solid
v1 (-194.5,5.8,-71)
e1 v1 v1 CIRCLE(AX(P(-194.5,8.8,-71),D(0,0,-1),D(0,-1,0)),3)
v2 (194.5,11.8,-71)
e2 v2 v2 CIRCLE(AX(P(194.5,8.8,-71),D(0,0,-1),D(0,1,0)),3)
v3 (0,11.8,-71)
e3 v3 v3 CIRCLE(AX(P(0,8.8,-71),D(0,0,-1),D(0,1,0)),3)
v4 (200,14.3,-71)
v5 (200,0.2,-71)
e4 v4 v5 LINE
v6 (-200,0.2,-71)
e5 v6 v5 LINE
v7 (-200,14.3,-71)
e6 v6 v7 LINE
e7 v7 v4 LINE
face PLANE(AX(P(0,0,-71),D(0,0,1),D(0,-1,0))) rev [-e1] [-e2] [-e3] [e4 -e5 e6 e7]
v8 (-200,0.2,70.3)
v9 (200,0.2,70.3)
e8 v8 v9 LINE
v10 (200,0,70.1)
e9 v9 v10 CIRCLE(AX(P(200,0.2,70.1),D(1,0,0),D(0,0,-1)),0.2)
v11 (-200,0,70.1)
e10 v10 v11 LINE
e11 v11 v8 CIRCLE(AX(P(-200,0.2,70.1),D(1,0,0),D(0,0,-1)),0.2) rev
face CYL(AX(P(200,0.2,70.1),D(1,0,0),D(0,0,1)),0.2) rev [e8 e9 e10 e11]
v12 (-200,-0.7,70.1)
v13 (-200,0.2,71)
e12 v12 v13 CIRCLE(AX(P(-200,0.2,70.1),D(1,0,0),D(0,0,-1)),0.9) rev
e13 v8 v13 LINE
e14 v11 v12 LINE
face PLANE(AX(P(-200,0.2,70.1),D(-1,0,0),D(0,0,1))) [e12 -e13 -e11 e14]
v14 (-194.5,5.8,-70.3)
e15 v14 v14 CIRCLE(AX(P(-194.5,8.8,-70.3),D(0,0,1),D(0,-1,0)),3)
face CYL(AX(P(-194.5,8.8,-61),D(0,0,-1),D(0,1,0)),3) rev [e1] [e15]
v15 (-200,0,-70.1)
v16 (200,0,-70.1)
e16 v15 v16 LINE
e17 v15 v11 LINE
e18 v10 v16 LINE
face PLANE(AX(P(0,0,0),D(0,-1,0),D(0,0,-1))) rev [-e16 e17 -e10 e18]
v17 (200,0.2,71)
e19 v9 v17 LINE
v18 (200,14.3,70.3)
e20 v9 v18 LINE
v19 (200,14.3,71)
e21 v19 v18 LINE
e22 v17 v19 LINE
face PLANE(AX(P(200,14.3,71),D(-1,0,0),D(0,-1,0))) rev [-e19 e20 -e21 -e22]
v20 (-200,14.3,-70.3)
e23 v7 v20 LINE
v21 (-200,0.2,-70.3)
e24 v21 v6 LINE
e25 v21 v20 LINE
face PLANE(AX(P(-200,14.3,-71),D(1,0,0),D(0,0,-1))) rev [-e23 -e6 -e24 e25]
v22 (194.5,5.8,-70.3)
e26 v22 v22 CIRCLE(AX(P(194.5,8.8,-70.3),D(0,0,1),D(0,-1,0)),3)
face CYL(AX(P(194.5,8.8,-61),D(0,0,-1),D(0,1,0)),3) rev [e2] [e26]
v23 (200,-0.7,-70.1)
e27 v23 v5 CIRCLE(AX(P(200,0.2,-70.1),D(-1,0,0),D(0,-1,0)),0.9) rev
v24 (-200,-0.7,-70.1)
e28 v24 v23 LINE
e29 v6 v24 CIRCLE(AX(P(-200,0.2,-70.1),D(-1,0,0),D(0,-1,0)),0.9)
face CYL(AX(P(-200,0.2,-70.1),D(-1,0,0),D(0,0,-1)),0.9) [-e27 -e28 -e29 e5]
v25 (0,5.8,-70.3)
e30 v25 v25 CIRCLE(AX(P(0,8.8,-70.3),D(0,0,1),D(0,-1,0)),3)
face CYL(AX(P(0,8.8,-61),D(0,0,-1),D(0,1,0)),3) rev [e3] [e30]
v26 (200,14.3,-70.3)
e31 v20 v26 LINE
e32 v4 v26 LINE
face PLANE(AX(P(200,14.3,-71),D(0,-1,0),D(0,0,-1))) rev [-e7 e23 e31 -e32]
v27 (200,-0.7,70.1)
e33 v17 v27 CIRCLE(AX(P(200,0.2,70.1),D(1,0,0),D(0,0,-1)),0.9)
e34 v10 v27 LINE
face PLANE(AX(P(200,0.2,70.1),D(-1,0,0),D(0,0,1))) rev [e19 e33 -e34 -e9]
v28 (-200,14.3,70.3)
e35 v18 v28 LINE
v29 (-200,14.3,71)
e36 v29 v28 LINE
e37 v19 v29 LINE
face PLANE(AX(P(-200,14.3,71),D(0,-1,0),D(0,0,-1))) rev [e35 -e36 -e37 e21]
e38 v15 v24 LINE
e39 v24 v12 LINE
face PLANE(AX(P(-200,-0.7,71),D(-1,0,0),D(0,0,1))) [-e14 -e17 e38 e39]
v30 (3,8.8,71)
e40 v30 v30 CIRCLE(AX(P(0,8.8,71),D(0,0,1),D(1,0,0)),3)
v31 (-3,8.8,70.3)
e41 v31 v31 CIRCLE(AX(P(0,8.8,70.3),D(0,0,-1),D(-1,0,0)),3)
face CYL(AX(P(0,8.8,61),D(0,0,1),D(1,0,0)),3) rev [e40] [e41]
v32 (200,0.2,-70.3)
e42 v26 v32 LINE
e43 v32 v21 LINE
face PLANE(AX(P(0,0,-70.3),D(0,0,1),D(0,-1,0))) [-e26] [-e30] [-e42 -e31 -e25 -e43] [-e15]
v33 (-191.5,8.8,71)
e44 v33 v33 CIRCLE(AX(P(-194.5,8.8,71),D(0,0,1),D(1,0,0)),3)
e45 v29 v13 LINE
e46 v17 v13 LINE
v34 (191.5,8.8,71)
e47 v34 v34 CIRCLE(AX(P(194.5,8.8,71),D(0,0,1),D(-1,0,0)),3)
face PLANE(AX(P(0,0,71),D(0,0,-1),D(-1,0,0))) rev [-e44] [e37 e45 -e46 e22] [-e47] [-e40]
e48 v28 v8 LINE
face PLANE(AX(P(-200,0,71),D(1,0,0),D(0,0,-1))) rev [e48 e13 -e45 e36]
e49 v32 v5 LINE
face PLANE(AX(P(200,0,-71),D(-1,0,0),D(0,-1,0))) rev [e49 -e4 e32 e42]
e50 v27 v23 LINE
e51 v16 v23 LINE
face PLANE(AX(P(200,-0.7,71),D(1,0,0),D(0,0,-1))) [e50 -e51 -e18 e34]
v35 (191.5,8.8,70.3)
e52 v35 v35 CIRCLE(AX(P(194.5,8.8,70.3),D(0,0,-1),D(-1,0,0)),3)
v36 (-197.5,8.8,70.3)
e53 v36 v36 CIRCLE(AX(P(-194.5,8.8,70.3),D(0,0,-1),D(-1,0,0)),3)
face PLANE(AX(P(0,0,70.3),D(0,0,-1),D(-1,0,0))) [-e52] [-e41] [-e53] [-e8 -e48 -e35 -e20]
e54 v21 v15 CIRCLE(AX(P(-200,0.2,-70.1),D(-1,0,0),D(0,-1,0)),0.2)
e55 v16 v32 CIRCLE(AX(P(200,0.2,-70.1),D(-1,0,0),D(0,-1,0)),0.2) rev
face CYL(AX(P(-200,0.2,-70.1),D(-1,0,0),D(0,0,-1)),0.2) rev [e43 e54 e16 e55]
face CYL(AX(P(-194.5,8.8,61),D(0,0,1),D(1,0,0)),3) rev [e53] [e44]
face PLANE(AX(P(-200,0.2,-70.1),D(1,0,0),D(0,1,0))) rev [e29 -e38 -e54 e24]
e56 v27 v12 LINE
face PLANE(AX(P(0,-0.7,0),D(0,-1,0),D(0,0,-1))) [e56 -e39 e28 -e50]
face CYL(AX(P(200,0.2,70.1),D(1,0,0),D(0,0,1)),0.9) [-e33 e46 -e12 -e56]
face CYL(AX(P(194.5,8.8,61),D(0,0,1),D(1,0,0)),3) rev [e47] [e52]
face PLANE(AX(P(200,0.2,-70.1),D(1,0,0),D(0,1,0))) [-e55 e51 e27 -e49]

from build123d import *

# Parameters (mm, degrees)
SKETCH_1_W                         = 400
SKETCH_1_H                         = 142
SM_BASE_FLANGE_1_DEPTH             = 0.7
SM_EDGE_FLANGE_1_STRIP_W           = 3.2
SM_EDGE_FLANGE_1_STRIP_H           = 0.7
SM_EDGE_FLANGE_1_STRIP_CUT_DEPTH   = 400
SM_EDGE_FLANGE_1_STRIP_2_W         = 3.2
SM_EDGE_FLANGE_1_STRIP_2_H         = 0.7
SM_EDGE_FLANGE_1_STRIP_CUT_2_DEPTH = 400
SM_EDGE_FLANGE_1_DEPTH             = 400
SM_EDGE_FLANGE_1_BEND_DEPTH        = 400
SKETCH_17_R                        = 3
CUT_EXTRUDE_1_DEPTH                = 10
CUT_EXTRUDE_START                  = -10
SKETCH_18_R                        = 3
CUT_EXTRUDE_2_DEPTH                = 10


# Sheet-metal steps are written as plain solids
with BuildPart() as part:
    # 草图1 → 基体-法兰1 (new body)
    with BuildSketch(Plane(origin=(0, 0, 0), x_dir=(1, 0, 0), z_dir=(0, 1, 0))):
        Rectangle(SKETCH_1_W, SKETCH_1_H)
    extrude(amount=-SM_BASE_FLANGE_1_DEPTH)

    # 边线-法兰1 strip (across the edge) → 边线-法兰1 strip cut (cut)
    with BuildSketch(Plane(origin=(200, 0, -71), x_dir=(0, 0, 1), z_dir=(-1, 0, 0))):
        with Locations((-0.7, -0.35)):
            Rectangle(SM_EDGE_FLANGE_1_STRIP_W, SM_EDGE_FLANGE_1_STRIP_H)
    extrude(amount=SM_EDGE_FLANGE_1_STRIP_CUT_DEPTH, mode=Mode.SUBTRACT)

    # 边线-法兰1 strip 2 (across the edge) → 边线-法兰1 strip cut 2 (cut)
    with BuildSketch(Plane(origin=(-200, 0, 71), x_dir=(0, 0, -1), z_dir=(1, 0, 0))):
        with Locations((-0.7, -0.35)):
            Rectangle(SM_EDGE_FLANGE_1_STRIP_2_W, SM_EDGE_FLANGE_1_STRIP_2_H)
    extrude(amount=SM_EDGE_FLANGE_1_STRIP_CUT_2_DEPTH, mode=Mode.SUBTRACT)

    # 边线-法兰1 section (across the edge) → 边线-法兰1 (add)
    with BuildSketch(Plane(origin=(200, 0, -71), x_dir=(0, 0, 1), z_dir=(-1, 0, 0))):
        with BuildLine():
            Line((0, 0.2), (0, 14.3))
            Line((0, 14.3), (0.7, 14.3))
            Line((0.7, 14.3), (0.7, 0.2))
            ThreePointArc((0.7, 0.2), (0.758578644, 0.058578644), (0.9, 0))
            Line((0.9, 0), (0.9, -0.7))
            ThreePointArc((0.9, -0.7), (0.263603897, -0.436396103), (0, 0.2))
        make_face()
    extrude(amount=SM_EDGE_FLANGE_1_DEPTH)

    # 边线-法兰1 section 2 (across the edge) → 边线-法兰1 bend (add)
    with BuildSketch(Plane(origin=(-200, 0, 71), x_dir=(0, 0, -1), z_dir=(1, 0, 0))):
        with BuildLine():
            Line((0, 0.2), (0, 14.3))
            Line((0, 14.3), (0.7, 14.3))
            Line((0.7, 14.3), (0.7, 0.2))
            ThreePointArc((0.7, 0.2), (0.758578644, 0.058578644), (0.9, 0))
            Line((0.9, 0), (0.9, -0.7))
            ThreePointArc((0.9, -0.7), (0.263603897, -0.436396103), (0, 0.2))
        make_face()
    extrude(amount=SM_EDGE_FLANGE_1_BEND_DEPTH)

    # 草图17 → 切除-拉伸1 (cut)
    with BuildSketch(Plane(origin=(0, 0, -71), x_dir=(-1, 0, 0), z_dir=(0, 0, -1))):
        with Locations(Location((-194.5, 8.8, 0), (0, 0, 90))):
            Circle(SKETCH_17_R)
        with Locations(Location((0, 8.8, 0), (0, 0, 90))):
            Circle(SKETCH_17_R)
        with Locations(Location((194.5, 8.8, 0), (0, 0, 270))):
            Circle(SKETCH_17_R)
    extrude(amount=-CUT_EXTRUDE_1_DEPTH, mode=Mode.SUBTRACT)

    # 草图18 → 切除-拉伸2 (cut)
    with BuildSketch(Plane.XY.offset(71).offset(CUT_EXTRUDE_START)):
        with Locations(Location((-194.5, 8.8, 0), (0, 0, 270))):
            Circle(SKETCH_18_R)
        with Locations(Location((0, 8.8, 0), (0, 0, 90))):
            Circle(SKETCH_18_R)
        with Locations(Location((194.5, 8.8, 0), (0, 0, 90))):
            Circle(SKETCH_18_R)
    extrude(amount=CUT_EXTRUDE_2_DEPTH, mode=Mode.SUBTRACT)


solid = part.part
